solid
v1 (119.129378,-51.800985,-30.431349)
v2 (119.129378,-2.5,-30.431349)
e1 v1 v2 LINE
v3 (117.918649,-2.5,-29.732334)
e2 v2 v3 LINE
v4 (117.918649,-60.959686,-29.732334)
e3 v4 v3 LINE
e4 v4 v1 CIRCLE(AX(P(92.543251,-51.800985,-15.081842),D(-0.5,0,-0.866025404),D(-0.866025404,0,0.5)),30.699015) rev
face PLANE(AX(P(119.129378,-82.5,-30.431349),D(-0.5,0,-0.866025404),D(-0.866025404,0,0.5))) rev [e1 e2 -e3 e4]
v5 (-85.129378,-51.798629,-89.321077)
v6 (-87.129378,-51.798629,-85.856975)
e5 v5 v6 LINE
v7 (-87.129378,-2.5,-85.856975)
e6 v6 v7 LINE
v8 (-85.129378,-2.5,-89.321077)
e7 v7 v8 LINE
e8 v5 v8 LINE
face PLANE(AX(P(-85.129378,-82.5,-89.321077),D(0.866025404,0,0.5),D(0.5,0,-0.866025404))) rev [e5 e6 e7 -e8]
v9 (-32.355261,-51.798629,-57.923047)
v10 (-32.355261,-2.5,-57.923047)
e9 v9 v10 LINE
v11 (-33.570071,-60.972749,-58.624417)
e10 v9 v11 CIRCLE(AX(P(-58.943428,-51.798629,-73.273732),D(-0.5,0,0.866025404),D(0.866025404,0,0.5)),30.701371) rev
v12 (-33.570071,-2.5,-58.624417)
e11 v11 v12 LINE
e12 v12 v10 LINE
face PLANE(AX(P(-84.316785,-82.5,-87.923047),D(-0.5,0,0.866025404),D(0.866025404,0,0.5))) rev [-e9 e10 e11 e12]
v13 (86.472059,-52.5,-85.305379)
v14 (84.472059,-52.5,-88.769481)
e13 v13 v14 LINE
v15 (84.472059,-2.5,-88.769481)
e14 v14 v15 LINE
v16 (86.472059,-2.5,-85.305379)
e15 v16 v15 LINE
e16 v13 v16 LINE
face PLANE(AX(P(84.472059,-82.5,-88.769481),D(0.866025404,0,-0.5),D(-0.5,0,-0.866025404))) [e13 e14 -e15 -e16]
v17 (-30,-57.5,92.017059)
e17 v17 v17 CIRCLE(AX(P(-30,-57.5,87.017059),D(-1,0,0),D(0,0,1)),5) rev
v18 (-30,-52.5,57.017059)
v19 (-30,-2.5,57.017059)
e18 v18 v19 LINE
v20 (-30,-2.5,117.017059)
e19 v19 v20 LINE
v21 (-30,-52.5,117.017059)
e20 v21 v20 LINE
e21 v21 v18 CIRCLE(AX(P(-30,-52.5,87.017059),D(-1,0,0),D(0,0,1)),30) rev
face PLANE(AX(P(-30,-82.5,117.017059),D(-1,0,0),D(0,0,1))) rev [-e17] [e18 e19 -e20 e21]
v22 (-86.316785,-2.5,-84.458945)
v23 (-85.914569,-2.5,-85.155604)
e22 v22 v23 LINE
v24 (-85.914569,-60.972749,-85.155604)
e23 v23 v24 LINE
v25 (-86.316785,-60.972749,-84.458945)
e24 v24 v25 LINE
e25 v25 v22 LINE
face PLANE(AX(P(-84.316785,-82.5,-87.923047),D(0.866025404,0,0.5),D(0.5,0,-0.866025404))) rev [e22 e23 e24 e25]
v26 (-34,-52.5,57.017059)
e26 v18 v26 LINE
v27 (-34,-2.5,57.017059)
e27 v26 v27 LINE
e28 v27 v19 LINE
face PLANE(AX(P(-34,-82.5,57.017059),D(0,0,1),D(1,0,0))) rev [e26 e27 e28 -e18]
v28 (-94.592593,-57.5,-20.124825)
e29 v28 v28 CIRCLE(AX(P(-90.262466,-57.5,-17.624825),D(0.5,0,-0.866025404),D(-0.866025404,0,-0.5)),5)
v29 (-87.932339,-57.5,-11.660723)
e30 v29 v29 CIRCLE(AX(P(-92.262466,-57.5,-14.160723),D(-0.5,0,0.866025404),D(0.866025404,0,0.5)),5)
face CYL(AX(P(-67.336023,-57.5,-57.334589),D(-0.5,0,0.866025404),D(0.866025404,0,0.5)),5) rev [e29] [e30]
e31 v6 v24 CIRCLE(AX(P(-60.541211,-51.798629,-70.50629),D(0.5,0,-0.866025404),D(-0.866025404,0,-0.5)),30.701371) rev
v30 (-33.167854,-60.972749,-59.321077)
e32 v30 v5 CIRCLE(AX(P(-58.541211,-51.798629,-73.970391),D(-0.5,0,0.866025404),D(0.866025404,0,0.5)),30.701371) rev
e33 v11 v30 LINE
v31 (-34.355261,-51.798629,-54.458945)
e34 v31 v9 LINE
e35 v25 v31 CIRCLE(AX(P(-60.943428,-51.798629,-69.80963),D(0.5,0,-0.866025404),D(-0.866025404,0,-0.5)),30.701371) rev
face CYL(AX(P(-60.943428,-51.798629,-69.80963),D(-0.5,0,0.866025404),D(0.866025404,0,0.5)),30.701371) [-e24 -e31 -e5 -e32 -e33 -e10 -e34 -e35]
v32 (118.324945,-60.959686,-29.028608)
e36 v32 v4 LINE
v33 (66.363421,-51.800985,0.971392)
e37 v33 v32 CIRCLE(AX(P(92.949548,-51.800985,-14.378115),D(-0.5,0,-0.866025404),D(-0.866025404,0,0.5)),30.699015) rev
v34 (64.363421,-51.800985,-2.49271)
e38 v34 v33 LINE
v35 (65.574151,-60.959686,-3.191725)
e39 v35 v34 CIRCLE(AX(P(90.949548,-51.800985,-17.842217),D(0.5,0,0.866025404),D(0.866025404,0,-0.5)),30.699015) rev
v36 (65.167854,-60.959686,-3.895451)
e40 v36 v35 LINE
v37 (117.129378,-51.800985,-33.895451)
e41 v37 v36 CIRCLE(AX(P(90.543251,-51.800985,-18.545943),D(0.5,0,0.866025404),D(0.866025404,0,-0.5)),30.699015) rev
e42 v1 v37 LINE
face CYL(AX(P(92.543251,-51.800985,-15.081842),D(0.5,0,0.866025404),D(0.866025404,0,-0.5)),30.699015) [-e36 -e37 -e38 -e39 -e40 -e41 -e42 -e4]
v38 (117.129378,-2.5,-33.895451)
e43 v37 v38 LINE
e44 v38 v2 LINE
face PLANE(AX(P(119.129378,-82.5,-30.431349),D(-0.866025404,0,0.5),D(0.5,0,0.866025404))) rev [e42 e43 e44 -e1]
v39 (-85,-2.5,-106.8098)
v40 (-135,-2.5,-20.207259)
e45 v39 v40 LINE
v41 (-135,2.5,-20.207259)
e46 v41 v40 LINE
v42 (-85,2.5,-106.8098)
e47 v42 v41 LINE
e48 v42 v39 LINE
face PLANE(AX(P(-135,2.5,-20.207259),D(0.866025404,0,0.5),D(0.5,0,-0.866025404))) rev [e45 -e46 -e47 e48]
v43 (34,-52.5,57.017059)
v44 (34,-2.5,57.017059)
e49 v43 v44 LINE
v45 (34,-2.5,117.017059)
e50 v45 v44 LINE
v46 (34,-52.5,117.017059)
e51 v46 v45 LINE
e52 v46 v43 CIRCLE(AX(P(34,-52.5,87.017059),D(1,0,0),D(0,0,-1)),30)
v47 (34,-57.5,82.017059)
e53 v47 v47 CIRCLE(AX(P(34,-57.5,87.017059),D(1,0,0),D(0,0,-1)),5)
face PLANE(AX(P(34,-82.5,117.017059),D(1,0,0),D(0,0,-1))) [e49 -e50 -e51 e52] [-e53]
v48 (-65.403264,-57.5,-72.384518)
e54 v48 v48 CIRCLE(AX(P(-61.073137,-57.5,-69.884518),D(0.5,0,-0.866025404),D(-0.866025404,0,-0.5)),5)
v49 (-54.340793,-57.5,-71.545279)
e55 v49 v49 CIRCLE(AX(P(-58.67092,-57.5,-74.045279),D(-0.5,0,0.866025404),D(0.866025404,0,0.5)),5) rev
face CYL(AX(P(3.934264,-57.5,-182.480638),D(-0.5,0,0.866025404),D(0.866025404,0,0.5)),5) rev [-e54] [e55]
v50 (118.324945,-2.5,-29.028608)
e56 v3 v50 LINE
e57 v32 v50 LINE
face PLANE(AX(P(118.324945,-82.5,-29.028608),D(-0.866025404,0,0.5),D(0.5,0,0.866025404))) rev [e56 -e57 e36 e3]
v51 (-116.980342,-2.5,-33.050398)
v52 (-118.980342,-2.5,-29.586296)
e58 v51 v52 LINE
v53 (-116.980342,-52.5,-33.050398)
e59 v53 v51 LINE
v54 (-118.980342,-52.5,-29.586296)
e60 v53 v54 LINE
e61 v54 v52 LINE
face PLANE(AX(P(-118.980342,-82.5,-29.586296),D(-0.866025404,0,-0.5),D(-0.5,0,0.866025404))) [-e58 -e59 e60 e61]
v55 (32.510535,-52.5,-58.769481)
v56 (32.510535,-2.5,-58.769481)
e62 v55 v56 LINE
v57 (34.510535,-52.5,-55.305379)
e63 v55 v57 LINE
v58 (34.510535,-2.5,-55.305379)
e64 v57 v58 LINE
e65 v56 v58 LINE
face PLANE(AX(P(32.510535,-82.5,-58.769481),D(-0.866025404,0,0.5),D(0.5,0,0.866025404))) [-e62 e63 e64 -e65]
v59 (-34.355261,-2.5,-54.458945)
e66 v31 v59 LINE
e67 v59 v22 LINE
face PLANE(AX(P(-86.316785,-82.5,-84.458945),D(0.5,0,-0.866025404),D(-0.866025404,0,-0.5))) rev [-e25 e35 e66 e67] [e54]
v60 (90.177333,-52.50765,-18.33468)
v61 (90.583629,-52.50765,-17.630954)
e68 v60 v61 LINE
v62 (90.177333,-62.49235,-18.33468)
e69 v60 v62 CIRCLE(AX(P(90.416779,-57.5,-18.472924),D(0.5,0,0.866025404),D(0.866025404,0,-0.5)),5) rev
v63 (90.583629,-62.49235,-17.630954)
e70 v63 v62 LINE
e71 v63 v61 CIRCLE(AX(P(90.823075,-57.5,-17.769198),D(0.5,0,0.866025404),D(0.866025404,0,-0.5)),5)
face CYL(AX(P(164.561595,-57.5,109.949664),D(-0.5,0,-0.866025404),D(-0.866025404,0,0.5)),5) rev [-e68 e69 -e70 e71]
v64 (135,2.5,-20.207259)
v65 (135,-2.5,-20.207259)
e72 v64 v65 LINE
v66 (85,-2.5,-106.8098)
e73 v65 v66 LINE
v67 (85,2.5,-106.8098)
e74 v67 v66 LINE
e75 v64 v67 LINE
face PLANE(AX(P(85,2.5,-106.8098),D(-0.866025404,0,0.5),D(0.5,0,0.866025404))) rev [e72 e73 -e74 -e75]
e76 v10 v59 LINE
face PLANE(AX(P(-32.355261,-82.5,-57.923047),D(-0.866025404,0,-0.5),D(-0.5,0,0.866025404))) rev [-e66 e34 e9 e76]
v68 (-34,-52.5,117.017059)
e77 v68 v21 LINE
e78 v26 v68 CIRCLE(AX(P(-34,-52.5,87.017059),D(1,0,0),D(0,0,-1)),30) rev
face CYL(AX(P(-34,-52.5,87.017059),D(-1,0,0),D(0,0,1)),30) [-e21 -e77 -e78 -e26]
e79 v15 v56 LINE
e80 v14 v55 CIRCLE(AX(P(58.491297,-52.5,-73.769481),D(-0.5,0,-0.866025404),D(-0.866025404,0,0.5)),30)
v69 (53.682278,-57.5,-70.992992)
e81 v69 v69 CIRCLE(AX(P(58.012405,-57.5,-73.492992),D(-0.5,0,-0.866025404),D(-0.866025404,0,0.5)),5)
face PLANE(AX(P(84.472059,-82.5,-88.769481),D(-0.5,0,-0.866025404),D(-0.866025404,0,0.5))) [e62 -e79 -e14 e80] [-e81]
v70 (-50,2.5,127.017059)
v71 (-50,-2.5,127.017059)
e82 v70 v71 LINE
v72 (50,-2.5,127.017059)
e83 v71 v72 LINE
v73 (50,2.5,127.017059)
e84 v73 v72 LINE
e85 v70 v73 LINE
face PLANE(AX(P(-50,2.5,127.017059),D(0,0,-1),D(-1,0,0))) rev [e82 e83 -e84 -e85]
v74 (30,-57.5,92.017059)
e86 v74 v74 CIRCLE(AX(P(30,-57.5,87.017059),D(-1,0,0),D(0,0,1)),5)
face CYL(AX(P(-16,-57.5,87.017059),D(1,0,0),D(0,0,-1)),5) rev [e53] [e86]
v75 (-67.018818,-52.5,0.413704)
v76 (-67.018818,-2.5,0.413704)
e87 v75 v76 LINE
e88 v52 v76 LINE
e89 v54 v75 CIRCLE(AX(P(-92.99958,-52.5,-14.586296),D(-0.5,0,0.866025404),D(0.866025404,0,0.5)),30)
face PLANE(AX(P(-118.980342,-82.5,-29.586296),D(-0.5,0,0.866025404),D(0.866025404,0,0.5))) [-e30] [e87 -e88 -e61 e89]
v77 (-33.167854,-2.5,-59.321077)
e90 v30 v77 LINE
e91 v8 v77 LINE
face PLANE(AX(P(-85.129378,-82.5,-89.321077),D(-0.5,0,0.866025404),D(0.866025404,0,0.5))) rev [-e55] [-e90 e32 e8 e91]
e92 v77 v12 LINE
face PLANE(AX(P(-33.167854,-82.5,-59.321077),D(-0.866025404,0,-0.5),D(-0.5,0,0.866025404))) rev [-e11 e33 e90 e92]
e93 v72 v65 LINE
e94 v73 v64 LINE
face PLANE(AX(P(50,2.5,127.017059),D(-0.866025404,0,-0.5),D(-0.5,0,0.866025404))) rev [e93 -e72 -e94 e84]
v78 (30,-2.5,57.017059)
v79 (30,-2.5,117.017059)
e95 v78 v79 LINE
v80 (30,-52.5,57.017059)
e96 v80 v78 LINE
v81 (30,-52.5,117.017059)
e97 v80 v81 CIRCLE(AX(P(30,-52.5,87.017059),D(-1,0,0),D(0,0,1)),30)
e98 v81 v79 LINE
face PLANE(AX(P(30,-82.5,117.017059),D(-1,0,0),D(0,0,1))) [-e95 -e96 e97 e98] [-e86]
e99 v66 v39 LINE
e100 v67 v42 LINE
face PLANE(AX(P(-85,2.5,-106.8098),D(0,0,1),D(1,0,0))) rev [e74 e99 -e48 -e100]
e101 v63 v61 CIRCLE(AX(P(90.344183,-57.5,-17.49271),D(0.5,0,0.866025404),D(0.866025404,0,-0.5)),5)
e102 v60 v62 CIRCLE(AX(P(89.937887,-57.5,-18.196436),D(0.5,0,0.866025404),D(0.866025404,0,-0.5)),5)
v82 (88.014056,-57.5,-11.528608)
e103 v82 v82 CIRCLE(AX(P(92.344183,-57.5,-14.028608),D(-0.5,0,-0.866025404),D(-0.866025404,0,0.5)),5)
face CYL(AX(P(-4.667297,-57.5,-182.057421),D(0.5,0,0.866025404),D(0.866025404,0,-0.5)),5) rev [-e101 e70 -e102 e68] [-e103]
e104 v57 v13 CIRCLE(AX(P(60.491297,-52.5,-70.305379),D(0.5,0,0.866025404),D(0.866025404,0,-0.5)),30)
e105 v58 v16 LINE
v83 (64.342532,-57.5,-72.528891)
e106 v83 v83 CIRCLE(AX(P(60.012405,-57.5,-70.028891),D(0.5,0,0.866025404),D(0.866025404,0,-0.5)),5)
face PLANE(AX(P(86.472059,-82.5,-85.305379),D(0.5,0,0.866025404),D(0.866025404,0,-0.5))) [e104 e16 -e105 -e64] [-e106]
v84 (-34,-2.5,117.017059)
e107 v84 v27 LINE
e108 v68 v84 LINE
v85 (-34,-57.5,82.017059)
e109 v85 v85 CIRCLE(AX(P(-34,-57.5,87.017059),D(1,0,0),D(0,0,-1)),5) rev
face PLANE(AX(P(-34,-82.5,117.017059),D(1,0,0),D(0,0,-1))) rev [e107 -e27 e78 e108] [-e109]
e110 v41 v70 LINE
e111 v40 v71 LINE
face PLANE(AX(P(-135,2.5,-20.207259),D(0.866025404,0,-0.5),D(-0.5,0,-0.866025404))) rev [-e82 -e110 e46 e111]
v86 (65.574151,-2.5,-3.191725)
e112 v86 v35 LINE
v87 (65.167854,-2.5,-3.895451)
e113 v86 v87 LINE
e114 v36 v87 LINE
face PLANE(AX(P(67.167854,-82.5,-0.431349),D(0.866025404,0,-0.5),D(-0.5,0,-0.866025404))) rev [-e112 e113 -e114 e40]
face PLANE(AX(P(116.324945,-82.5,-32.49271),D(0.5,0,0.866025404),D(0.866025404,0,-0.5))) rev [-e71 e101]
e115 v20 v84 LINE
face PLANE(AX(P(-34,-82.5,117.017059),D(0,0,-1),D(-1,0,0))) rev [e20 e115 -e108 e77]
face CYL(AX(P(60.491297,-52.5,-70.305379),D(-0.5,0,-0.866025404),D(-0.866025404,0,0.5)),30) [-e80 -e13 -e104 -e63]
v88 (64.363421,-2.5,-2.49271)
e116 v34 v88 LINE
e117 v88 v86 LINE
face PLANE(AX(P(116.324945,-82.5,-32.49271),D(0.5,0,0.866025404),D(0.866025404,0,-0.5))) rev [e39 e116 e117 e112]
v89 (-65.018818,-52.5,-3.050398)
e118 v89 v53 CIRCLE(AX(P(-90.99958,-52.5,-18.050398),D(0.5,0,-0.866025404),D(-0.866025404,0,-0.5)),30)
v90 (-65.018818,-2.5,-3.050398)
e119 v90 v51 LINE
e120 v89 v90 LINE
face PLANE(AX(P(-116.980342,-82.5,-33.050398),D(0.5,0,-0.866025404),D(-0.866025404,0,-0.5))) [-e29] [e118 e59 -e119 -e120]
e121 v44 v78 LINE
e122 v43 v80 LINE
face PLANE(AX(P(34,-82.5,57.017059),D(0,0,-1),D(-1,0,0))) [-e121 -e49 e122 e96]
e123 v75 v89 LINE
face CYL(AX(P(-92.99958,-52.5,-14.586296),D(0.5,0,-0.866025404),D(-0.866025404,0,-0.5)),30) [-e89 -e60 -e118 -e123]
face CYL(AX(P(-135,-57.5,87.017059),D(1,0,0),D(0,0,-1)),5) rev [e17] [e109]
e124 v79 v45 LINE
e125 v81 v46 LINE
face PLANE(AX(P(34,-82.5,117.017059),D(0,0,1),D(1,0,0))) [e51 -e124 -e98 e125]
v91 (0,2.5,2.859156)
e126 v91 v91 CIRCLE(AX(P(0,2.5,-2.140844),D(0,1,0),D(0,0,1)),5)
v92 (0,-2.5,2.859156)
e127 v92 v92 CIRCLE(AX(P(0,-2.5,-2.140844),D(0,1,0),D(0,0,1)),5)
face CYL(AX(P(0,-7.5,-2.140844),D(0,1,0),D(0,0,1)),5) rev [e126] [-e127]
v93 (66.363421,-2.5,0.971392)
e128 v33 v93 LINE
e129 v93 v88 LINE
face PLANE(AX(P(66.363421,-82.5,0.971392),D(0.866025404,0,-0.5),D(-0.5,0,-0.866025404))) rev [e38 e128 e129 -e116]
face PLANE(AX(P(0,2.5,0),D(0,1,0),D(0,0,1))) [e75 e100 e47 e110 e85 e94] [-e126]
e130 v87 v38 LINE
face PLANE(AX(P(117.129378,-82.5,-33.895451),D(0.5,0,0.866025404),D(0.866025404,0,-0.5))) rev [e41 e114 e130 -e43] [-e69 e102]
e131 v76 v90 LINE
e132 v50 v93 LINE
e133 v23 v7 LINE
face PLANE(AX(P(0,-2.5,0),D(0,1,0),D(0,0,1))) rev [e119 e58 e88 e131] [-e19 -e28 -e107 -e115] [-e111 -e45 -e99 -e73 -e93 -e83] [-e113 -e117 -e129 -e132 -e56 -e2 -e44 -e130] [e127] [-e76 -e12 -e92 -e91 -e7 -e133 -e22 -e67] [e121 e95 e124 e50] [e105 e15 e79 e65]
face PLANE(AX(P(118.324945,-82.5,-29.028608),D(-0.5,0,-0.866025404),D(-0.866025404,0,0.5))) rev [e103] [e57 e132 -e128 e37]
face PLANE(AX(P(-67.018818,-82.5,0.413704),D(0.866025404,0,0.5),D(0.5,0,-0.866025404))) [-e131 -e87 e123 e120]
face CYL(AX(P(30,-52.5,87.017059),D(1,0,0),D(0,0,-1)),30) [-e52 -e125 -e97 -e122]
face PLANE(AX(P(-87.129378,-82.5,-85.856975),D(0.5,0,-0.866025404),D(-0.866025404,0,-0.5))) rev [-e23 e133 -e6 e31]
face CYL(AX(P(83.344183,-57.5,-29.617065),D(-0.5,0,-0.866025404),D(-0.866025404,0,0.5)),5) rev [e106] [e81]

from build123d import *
from build123d.topology import SkipClean

# Parameters (mm, degrees)
BOSS_EXTRUDE1_DEPTH     = 2.5
SKETCH2_W               = 4
SKETCH2_H               = 60
BOSS_EXTRUDE2_DEPTH     = 80
CUT_EXTRUDE1_START      = -50
SKETCH4_R               = 5
CUT_EXTRUDE1_DEPTH      = 277.937399591
SKETCH5_R               = 5
CUT_EXTRUDE2_DEPTH      = 50
CIRPATTERN5_START       = 30.789632312
CIRPATTERN5_OUTLINE_W   = 60
CIRPATTERN5_OUTLINE_H   = 80
CIRPATTERN5_OUTLINE_R   = 5
CIRPATTERN5_DEPTH       = 4
CIRPATTERN5_START_2     = 29.210367688
CIRPATTERN5_2_OUTLINE_W = 60
CIRPATTERN5_2_OUTLINE_H = 80
CIRPATTERN5_2_OUTLINE_R = 5
CIRPATTERN5_2_DEPTH     = 4
CIRPATTERN6_START       = -33.867687061
CIRPATTERN6_OUTLINE_W   = 60
CIRPATTERN6_OUTLINE_H   = 80
CIRPATTERN6_OUTLINE_R   = 5
CIRPATTERN6_DEPTH       = 4
CIRPATTERN6_START_2     = 29.98519923
CIRPATTERN6_2_OUTLINE_W = 60
CIRPATTERN6_2_OUTLINE_H = 80
CIRPATTERN6_2_DEPTH     = 4
CIRPATTERN6_START_3     = -34.64059617
CIRPATTERN6_3_OUTLINE_W = 60
CIRPATTERN6_3_OUTLINE_H = 80
CIRPATTERN6_3_OUTLINE_R = 5
CIRPATTERN6_3_DEPTH     = 4
CIRPATTERN6_START_4     = 30.022960672
CIRPATTERN6_4_OUTLINE_W = 60
CIRPATTERN6_4_OUTLINE_H = 80
CIRPATTERN6_4_DEPTH     = 4
CIRPATTERN6_5_OUTLINE_R = 5
CIRPATTERN6_5_DEPTH     = 0.663556842
CUT_EXTRUDE3_START      = -50
SKETCH7_R               = 5
CUT_EXTRUDE3_DEPTH      = 50
CUT_EXTRUDE4_DEPTH      = 231.175674448
CUT_EXTRUDE4_DEPTH_BACK = 231.175674448
SKETCH8_R               = 5
FILLET1_RADIUS          = 30
FILLET1_LENGTH          = 4
FILLET5_RADIUS          = 30
FILLET5_LENGTH          = 4
FILLET6_R               = 30.699015
FILLET7_RADIUS          = 30
FILLET7_LENGTH          = 4
FILLET8_RADIUS          = 30
FILLET8_LENGTH          = 4
FILLET9_R               = 30.701371
SKETCH9_R               = 5
CUT_EXTRUDE5_DEPTH      = 10


# Read off the part's stored shape, not the designer's step: CirPattern5, CirPattern6
with BuildPart() as part:
    # Sketch1 → Boss-Extrude1 (new, symmetric)
    with BuildSketch(Plane(origin=(0, 0, 0), x_dir=(1, 0, 0), z_dir=(0, 1, 0))):
        Polygon((-135, 20.207259422), (-85, 106.8097998), (85, 106.8097998), (135, 20.207259422), (50, -127.017059222), (0, -127.017059222), (-50, -127.017059222), align=None)
    extrude(amount=BOSS_EXTRUDE1_DEPTH, both=True)

    # Sketch2 → Boss-Extrude2 (add)
    with BuildSketch(Plane.XZ.offset(2.5)):
        with Locations((-32, 87.017059222)):
            Rectangle(SKETCH2_W, SKETCH2_H)
    boss_extrude2 = extrude(amount=BOSS_EXTRUDE2_DEPTH)

    # Mirror1: Boss-Extrude2 across plane
    add(boss_extrude2.mirror(Plane(origin=(0, 0, 0), x_dir=(0, 0, 1), z_dir=(1, 0, 0))))

    # Sketch4 → Cut-Extrude1 (cut)
    with BuildSketch(Plane.ZY.offset(34).offset(CUT_EXTRUDE1_START)):
        with Locations(Location((87.017059222, -57.5, 0), (0, 0, 180))):
            Circle(SKETCH4_R)
    extrude(amount=CUT_EXTRUDE1_DEPTH, mode=Mode.SUBTRACT)

    # Sketch5 → Cut-Extrude2 (cut)
    with BuildSketch(Plane(origin=(34, 0, 0), x_dir=(0, 0, -1), z_dir=(1, 0, 0))):
        with Locations((-87.017059222, -57.5)):
            Circle(SKETCH5_R)
    extrude(amount=-CUT_EXTRUDE2_DEPTH, mode=Mode.SUBTRACT)

    # CirPattern5 outline → CirPattern5 (add)
    with BuildSketch(Plane(origin=(0, 0, 0), x_dir=(0.8660254037844362, 0, 0.5000000000000042), z_dir=(0.5000000000000042, 0, -0.8660254037844363)).offset(CIRPATTERN5_START)):
        with Locations((-88.384742505, 42.5)):
            Rectangle(CIRPATTERN5_OUTLINE_W, CIRPATTERN5_OUTLINE_H)
        with Locations((-87.833146876, 57.5)):
            Circle(CIRPATTERN5_OUTLINE_R, mode=Mode.SUBTRACT)
    extrude(amount=CIRPATTERN5_DEPTH)

    # CirPattern5 2 outline → CirPattern5 2 (add)
    with BuildSketch(Plane(origin=(0, 0, 0), x_dir=(0.8660254037844431, 0, -0.4999999999999921), z_dir=(0.4999999999999921, 0, 0.8660254037844433)).offset(CIRPATTERN5_START_2)):
        with Locations((88.384742505, -42.5)):
            Rectangle(CIRPATTERN5_2_OUTLINE_W, CIRPATTERN5_2_OUTLINE_H)
        with Locations((87.539689415, -57.5)):
            Circle(CIRPATTERN5_2_OUTLINE_R, mode=Mode.SUBTRACT)
    extrude(amount=CIRPATTERN5_2_DEPTH)

    # CirPattern6 outline → CirPattern6 (add)
    with BuildSketch(Plane(origin=(0, 0, 0), x_dir=(0.8660254037844362, 0, 0.5000000000000042), z_dir=(0.5000000000000042, 0, -0.8660254037844363)).offset(CIRPATTERN6_START)):
        with Locations((-87.833146876, 42.5)):
            Rectangle(CIRPATTERN6_OUTLINE_W, CIRPATTERN6_OUTLINE_H)
        with Locations((-86.982001293, 57.5)):
            Circle(CIRPATTERN6_OUTLINE_R, mode=Mode.SUBTRACT)
    extrude(amount=CIRPATTERN6_DEPTH)

    # CirPattern6 2 outline → CirPattern6 2 (add)
    with BuildSketch(Plane(origin=(0, 0, 0), x_dir=(0.8660254037844362, 0, 0.5000000000000042), z_dir=(0.5000000000000042, 0, -0.8660254037844363)).offset(CIRPATTERN6_START_2)):
        with Locations((-86.982001293, 42.5)):
            Rectangle(CIRPATTERN6_2_OUTLINE_W, CIRPATTERN6_2_OUTLINE_H)
    extrude(amount=CIRPATTERN6_2_DEPTH)

    # CirPattern6 3 outline → CirPattern6 3 (add)
    with BuildSketch(Plane(origin=(0, 0, 0), x_dir=(0.8660254037844431, 0, -0.4999999999999921), z_dir=(0.4999999999999921, 0, 0.8660254037844433)).offset(CIRPATTERN6_START_3)):
        with Locations((87.539689415, -42.5)):
            Rectangle(CIRPATTERN6_3_OUTLINE_W, CIRPATTERN6_3_OUTLINE_H)
        with Locations((86.986712415, -57.5)):
            Circle(CIRPATTERN6_3_OUTLINE_R, mode=Mode.SUBTRACT)
    extrude(amount=CIRPATTERN6_3_DEPTH)

    # CirPattern6 4 outline → CirPattern6 4 (add)
    with BuildSketch(Plane(origin=(0, 0, 0), x_dir=(0.8660254037844431, 0, -0.4999999999999921), z_dir=(0.4999999999999921, 0, 0.8660254037844433)).offset(CIRPATTERN6_START_4)):
        with Locations((86.986712415, -42.5)):
            Rectangle(CIRPATTERN6_4_OUTLINE_W, CIRPATTERN6_4_OUTLINE_H)
    extrude(amount=CIRPATTERN6_4_DEPTH)

    # CirPattern6 5 outline → CirPattern6 5 (add)
    with BuildSketch(Plane(origin=(0, 0, 0), x_dir=(0.8660254037844431, 0, -0.4999999999999921), z_dir=(0.4999999999999921, 0, 0.8660254037844433)).offset(CIRPATTERN6_START_3)):
        with Locations((86.986712415, -57.5)):
            Circle(CIRPATTERN6_5_OUTLINE_R)
    extrude(amount=CIRPATTERN6_5_DEPTH)

    # Sketch7 → Cut-Extrude3 (cut)
    with BuildSketch(Plane(origin=(17.394816156, 0, -30.128705371), x_dir=(-0.8660254037844363, 0, -0.5000000000000042), z_dir=(0.5000000000000042, 0, -0.8660254037844363)).offset(CUT_EXTRUDE3_START)):
        with Locations(Location((87.833146876, -57.5, 0), (0, 0, 180))):
            Circle(SKETCH7_R)
    extrude(amount=CUT_EXTRUDE3_DEPTH, mode=Mode.SUBTRACT)

    # Sketch8 → Cut-Extrude4 (cut, two sides: drawn at the far end of the back side and taken through both)
    with SkipClean():  # the faces are left unmerged after this step: merging them gives an invalid solid
        with BuildSketch(Plane(origin=(-15.320298085, 0, -26.535534671), x_dir=(0.8660254037844431, 0, -0.4999999999999922), z_dir=(0.4999999999999922, 0, 0.8660254037844431)).offset(-CUT_EXTRUDE4_DEPTH_BACK)):
            with Locations(Location((86.986712415, -57.5, 0), (0, 0, 180))):
                Circle(SKETCH8_R)
        extrude(amount=CUT_EXTRUDE4_DEPTH + CUT_EXTRUDE4_DEPTH_BACK, mode=Mode.SUBTRACT)
    add(part.part.scale(1), mode=Mode.REPLACE)  # the faces are merged on a copy

    # Fillet1: full round fillet: the end face becomes a half cylinder, R = half its width
    fillet1_face = Plane((-32, -82.5, 87.017059222), x_dir=(1, 0, 0), z_dir=(0, -1, 0))  # on the end face: x along it, z out of the body
    fillet1_slab = fillet1_face.offset(-FILLET1_RADIUS / 2) * Box(FILLET1_LENGTH, 2 * FILLET1_RADIUS, FILLET1_RADIUS, mode=Mode.PRIVATE)  # the body's end, R deep
    fillet1_round = Plane((-32, -52.5, 87.017059222), x_dir=(0, -1, 0), z_dir=(1, 0, 0)) * Cylinder(FILLET1_RADIUS, FILLET1_LENGTH, mode=Mode.PRIVATE)  # its axis R under the face
    add(fillet1_slab - fillet1_round, mode=Mode.SUBTRACT)

    # Fillet5: full round fillet: the end face becomes a half cylinder, R = half its width
    fillet5_face = Plane((32, -82.5, 87.017059222), x_dir=(-1, 0, 0), z_dir=(0, -1, 0))  # on the end face: x along it, z out of the body
    fillet5_slab = fillet5_face.offset(-FILLET5_RADIUS / 2) * Box(FILLET5_LENGTH, 2 * FILLET5_RADIUS, FILLET5_RADIUS, mode=Mode.PRIVATE)  # the body's end, R deep
    fillet5_round = Plane((32, -52.5, 87.017059222), x_dir=(0, -1, 0), z_dir=(-1, 0, 0)) * Cylinder(FILLET5_RADIUS, FILLET5_LENGTH, mode=Mode.PRIVATE)  # its axis R under the face
    add(fillet5_slab - fillet5_round, mode=Mode.SUBTRACT)

    # Fillet6
    fillet6_edges = [part.edges().sort_by_distance(p)[0] for p in [
        (65.363420966, -82.5, -0.760658761),
        (118.129378274, -82.5, -32.163399973),
    ]]
    fillet(fillet6_edges, radius=FILLET6_R)

    # Fillet7: full round fillet: the end face becomes a half cylinder, R = half its width
    fillet7_face = Plane((59.491296788, -82.5, -72.037430185), x_dir=(0.5, 0, 0.866025403784), z_dir=(0, -1, 0))  # on the end face: x along it, z out of the body
    fillet7_slab = fillet7_face.offset(-FILLET7_RADIUS / 2) * Box(FILLET7_LENGTH, 2 * FILLET7_RADIUS, FILLET7_RADIUS, mode=Mode.PRIVATE)  # the body's end, R deep
    fillet7_round = Plane((59.491296788, -52.5, -72.037430185), x_dir=(0, -1, 0), z_dir=(0.5, 0, 0.866025403784)) * Cylinder(FILLET7_RADIUS, FILLET7_LENGTH, mode=Mode.PRIVATE)  # its axis R under the face
    add(fillet7_slab - fillet7_round, mode=Mode.SUBTRACT)

    # Fillet8: full round fillet: the end face becomes a half cylinder, R = half its width
    fillet8_face = Plane((-91.999580019, -82.5, -16.318346883), x_dir=(0.5, 0, -0.866025403784), z_dir=(0, -1, 0))  # on the end face: x along it, z out of the body
    fillet8_slab = fillet8_face.offset(-FILLET8_RADIUS / 2) * Box(FILLET8_LENGTH, 2 * FILLET8_RADIUS, FILLET8_RADIUS, mode=Mode.PRIVATE)  # the body's end, R deep
    fillet8_round = Plane((-91.999580019, -52.5, -16.318346883), x_dir=(0, -1, 0), z_dir=(0.5, 0, -0.866025403784)) * Cylinder(FILLET8_RADIUS, FILLET8_LENGTH, mode=Mode.PRIVATE)  # its axis R under the face
    add(fillet8_slab - fillet8_round, mode=Mode.SUBTRACT)

    # Fillet9
    fillet9_edges = [part.edges().sort_by_distance(p)[0] for p in [
        (-33.355261063, -82.5, -56.190995725),
        (-86.129378274, -82.5, -87.589025815),
    ]]
    fillet(fillet9_edges, radius=FILLET9_R - 0.0001)  # a hair under: the kernel refuses the full size

    # Sketch9 → Cut-Extrude5 (cut)
    with BuildSketch(Plane(origin=(0, 2.5, 0), x_dir=(1, 0, 0), z_dir=(0, 1, 0))):
        with Locations(Location((0, 2.14084421, 0), (0, 0, 270))):
            Circle(SKETCH9_R)
    extrude(amount=-CUT_EXTRUDE5_DEPTH, mode=Mode.SUBTRACT)


solid = part.part
